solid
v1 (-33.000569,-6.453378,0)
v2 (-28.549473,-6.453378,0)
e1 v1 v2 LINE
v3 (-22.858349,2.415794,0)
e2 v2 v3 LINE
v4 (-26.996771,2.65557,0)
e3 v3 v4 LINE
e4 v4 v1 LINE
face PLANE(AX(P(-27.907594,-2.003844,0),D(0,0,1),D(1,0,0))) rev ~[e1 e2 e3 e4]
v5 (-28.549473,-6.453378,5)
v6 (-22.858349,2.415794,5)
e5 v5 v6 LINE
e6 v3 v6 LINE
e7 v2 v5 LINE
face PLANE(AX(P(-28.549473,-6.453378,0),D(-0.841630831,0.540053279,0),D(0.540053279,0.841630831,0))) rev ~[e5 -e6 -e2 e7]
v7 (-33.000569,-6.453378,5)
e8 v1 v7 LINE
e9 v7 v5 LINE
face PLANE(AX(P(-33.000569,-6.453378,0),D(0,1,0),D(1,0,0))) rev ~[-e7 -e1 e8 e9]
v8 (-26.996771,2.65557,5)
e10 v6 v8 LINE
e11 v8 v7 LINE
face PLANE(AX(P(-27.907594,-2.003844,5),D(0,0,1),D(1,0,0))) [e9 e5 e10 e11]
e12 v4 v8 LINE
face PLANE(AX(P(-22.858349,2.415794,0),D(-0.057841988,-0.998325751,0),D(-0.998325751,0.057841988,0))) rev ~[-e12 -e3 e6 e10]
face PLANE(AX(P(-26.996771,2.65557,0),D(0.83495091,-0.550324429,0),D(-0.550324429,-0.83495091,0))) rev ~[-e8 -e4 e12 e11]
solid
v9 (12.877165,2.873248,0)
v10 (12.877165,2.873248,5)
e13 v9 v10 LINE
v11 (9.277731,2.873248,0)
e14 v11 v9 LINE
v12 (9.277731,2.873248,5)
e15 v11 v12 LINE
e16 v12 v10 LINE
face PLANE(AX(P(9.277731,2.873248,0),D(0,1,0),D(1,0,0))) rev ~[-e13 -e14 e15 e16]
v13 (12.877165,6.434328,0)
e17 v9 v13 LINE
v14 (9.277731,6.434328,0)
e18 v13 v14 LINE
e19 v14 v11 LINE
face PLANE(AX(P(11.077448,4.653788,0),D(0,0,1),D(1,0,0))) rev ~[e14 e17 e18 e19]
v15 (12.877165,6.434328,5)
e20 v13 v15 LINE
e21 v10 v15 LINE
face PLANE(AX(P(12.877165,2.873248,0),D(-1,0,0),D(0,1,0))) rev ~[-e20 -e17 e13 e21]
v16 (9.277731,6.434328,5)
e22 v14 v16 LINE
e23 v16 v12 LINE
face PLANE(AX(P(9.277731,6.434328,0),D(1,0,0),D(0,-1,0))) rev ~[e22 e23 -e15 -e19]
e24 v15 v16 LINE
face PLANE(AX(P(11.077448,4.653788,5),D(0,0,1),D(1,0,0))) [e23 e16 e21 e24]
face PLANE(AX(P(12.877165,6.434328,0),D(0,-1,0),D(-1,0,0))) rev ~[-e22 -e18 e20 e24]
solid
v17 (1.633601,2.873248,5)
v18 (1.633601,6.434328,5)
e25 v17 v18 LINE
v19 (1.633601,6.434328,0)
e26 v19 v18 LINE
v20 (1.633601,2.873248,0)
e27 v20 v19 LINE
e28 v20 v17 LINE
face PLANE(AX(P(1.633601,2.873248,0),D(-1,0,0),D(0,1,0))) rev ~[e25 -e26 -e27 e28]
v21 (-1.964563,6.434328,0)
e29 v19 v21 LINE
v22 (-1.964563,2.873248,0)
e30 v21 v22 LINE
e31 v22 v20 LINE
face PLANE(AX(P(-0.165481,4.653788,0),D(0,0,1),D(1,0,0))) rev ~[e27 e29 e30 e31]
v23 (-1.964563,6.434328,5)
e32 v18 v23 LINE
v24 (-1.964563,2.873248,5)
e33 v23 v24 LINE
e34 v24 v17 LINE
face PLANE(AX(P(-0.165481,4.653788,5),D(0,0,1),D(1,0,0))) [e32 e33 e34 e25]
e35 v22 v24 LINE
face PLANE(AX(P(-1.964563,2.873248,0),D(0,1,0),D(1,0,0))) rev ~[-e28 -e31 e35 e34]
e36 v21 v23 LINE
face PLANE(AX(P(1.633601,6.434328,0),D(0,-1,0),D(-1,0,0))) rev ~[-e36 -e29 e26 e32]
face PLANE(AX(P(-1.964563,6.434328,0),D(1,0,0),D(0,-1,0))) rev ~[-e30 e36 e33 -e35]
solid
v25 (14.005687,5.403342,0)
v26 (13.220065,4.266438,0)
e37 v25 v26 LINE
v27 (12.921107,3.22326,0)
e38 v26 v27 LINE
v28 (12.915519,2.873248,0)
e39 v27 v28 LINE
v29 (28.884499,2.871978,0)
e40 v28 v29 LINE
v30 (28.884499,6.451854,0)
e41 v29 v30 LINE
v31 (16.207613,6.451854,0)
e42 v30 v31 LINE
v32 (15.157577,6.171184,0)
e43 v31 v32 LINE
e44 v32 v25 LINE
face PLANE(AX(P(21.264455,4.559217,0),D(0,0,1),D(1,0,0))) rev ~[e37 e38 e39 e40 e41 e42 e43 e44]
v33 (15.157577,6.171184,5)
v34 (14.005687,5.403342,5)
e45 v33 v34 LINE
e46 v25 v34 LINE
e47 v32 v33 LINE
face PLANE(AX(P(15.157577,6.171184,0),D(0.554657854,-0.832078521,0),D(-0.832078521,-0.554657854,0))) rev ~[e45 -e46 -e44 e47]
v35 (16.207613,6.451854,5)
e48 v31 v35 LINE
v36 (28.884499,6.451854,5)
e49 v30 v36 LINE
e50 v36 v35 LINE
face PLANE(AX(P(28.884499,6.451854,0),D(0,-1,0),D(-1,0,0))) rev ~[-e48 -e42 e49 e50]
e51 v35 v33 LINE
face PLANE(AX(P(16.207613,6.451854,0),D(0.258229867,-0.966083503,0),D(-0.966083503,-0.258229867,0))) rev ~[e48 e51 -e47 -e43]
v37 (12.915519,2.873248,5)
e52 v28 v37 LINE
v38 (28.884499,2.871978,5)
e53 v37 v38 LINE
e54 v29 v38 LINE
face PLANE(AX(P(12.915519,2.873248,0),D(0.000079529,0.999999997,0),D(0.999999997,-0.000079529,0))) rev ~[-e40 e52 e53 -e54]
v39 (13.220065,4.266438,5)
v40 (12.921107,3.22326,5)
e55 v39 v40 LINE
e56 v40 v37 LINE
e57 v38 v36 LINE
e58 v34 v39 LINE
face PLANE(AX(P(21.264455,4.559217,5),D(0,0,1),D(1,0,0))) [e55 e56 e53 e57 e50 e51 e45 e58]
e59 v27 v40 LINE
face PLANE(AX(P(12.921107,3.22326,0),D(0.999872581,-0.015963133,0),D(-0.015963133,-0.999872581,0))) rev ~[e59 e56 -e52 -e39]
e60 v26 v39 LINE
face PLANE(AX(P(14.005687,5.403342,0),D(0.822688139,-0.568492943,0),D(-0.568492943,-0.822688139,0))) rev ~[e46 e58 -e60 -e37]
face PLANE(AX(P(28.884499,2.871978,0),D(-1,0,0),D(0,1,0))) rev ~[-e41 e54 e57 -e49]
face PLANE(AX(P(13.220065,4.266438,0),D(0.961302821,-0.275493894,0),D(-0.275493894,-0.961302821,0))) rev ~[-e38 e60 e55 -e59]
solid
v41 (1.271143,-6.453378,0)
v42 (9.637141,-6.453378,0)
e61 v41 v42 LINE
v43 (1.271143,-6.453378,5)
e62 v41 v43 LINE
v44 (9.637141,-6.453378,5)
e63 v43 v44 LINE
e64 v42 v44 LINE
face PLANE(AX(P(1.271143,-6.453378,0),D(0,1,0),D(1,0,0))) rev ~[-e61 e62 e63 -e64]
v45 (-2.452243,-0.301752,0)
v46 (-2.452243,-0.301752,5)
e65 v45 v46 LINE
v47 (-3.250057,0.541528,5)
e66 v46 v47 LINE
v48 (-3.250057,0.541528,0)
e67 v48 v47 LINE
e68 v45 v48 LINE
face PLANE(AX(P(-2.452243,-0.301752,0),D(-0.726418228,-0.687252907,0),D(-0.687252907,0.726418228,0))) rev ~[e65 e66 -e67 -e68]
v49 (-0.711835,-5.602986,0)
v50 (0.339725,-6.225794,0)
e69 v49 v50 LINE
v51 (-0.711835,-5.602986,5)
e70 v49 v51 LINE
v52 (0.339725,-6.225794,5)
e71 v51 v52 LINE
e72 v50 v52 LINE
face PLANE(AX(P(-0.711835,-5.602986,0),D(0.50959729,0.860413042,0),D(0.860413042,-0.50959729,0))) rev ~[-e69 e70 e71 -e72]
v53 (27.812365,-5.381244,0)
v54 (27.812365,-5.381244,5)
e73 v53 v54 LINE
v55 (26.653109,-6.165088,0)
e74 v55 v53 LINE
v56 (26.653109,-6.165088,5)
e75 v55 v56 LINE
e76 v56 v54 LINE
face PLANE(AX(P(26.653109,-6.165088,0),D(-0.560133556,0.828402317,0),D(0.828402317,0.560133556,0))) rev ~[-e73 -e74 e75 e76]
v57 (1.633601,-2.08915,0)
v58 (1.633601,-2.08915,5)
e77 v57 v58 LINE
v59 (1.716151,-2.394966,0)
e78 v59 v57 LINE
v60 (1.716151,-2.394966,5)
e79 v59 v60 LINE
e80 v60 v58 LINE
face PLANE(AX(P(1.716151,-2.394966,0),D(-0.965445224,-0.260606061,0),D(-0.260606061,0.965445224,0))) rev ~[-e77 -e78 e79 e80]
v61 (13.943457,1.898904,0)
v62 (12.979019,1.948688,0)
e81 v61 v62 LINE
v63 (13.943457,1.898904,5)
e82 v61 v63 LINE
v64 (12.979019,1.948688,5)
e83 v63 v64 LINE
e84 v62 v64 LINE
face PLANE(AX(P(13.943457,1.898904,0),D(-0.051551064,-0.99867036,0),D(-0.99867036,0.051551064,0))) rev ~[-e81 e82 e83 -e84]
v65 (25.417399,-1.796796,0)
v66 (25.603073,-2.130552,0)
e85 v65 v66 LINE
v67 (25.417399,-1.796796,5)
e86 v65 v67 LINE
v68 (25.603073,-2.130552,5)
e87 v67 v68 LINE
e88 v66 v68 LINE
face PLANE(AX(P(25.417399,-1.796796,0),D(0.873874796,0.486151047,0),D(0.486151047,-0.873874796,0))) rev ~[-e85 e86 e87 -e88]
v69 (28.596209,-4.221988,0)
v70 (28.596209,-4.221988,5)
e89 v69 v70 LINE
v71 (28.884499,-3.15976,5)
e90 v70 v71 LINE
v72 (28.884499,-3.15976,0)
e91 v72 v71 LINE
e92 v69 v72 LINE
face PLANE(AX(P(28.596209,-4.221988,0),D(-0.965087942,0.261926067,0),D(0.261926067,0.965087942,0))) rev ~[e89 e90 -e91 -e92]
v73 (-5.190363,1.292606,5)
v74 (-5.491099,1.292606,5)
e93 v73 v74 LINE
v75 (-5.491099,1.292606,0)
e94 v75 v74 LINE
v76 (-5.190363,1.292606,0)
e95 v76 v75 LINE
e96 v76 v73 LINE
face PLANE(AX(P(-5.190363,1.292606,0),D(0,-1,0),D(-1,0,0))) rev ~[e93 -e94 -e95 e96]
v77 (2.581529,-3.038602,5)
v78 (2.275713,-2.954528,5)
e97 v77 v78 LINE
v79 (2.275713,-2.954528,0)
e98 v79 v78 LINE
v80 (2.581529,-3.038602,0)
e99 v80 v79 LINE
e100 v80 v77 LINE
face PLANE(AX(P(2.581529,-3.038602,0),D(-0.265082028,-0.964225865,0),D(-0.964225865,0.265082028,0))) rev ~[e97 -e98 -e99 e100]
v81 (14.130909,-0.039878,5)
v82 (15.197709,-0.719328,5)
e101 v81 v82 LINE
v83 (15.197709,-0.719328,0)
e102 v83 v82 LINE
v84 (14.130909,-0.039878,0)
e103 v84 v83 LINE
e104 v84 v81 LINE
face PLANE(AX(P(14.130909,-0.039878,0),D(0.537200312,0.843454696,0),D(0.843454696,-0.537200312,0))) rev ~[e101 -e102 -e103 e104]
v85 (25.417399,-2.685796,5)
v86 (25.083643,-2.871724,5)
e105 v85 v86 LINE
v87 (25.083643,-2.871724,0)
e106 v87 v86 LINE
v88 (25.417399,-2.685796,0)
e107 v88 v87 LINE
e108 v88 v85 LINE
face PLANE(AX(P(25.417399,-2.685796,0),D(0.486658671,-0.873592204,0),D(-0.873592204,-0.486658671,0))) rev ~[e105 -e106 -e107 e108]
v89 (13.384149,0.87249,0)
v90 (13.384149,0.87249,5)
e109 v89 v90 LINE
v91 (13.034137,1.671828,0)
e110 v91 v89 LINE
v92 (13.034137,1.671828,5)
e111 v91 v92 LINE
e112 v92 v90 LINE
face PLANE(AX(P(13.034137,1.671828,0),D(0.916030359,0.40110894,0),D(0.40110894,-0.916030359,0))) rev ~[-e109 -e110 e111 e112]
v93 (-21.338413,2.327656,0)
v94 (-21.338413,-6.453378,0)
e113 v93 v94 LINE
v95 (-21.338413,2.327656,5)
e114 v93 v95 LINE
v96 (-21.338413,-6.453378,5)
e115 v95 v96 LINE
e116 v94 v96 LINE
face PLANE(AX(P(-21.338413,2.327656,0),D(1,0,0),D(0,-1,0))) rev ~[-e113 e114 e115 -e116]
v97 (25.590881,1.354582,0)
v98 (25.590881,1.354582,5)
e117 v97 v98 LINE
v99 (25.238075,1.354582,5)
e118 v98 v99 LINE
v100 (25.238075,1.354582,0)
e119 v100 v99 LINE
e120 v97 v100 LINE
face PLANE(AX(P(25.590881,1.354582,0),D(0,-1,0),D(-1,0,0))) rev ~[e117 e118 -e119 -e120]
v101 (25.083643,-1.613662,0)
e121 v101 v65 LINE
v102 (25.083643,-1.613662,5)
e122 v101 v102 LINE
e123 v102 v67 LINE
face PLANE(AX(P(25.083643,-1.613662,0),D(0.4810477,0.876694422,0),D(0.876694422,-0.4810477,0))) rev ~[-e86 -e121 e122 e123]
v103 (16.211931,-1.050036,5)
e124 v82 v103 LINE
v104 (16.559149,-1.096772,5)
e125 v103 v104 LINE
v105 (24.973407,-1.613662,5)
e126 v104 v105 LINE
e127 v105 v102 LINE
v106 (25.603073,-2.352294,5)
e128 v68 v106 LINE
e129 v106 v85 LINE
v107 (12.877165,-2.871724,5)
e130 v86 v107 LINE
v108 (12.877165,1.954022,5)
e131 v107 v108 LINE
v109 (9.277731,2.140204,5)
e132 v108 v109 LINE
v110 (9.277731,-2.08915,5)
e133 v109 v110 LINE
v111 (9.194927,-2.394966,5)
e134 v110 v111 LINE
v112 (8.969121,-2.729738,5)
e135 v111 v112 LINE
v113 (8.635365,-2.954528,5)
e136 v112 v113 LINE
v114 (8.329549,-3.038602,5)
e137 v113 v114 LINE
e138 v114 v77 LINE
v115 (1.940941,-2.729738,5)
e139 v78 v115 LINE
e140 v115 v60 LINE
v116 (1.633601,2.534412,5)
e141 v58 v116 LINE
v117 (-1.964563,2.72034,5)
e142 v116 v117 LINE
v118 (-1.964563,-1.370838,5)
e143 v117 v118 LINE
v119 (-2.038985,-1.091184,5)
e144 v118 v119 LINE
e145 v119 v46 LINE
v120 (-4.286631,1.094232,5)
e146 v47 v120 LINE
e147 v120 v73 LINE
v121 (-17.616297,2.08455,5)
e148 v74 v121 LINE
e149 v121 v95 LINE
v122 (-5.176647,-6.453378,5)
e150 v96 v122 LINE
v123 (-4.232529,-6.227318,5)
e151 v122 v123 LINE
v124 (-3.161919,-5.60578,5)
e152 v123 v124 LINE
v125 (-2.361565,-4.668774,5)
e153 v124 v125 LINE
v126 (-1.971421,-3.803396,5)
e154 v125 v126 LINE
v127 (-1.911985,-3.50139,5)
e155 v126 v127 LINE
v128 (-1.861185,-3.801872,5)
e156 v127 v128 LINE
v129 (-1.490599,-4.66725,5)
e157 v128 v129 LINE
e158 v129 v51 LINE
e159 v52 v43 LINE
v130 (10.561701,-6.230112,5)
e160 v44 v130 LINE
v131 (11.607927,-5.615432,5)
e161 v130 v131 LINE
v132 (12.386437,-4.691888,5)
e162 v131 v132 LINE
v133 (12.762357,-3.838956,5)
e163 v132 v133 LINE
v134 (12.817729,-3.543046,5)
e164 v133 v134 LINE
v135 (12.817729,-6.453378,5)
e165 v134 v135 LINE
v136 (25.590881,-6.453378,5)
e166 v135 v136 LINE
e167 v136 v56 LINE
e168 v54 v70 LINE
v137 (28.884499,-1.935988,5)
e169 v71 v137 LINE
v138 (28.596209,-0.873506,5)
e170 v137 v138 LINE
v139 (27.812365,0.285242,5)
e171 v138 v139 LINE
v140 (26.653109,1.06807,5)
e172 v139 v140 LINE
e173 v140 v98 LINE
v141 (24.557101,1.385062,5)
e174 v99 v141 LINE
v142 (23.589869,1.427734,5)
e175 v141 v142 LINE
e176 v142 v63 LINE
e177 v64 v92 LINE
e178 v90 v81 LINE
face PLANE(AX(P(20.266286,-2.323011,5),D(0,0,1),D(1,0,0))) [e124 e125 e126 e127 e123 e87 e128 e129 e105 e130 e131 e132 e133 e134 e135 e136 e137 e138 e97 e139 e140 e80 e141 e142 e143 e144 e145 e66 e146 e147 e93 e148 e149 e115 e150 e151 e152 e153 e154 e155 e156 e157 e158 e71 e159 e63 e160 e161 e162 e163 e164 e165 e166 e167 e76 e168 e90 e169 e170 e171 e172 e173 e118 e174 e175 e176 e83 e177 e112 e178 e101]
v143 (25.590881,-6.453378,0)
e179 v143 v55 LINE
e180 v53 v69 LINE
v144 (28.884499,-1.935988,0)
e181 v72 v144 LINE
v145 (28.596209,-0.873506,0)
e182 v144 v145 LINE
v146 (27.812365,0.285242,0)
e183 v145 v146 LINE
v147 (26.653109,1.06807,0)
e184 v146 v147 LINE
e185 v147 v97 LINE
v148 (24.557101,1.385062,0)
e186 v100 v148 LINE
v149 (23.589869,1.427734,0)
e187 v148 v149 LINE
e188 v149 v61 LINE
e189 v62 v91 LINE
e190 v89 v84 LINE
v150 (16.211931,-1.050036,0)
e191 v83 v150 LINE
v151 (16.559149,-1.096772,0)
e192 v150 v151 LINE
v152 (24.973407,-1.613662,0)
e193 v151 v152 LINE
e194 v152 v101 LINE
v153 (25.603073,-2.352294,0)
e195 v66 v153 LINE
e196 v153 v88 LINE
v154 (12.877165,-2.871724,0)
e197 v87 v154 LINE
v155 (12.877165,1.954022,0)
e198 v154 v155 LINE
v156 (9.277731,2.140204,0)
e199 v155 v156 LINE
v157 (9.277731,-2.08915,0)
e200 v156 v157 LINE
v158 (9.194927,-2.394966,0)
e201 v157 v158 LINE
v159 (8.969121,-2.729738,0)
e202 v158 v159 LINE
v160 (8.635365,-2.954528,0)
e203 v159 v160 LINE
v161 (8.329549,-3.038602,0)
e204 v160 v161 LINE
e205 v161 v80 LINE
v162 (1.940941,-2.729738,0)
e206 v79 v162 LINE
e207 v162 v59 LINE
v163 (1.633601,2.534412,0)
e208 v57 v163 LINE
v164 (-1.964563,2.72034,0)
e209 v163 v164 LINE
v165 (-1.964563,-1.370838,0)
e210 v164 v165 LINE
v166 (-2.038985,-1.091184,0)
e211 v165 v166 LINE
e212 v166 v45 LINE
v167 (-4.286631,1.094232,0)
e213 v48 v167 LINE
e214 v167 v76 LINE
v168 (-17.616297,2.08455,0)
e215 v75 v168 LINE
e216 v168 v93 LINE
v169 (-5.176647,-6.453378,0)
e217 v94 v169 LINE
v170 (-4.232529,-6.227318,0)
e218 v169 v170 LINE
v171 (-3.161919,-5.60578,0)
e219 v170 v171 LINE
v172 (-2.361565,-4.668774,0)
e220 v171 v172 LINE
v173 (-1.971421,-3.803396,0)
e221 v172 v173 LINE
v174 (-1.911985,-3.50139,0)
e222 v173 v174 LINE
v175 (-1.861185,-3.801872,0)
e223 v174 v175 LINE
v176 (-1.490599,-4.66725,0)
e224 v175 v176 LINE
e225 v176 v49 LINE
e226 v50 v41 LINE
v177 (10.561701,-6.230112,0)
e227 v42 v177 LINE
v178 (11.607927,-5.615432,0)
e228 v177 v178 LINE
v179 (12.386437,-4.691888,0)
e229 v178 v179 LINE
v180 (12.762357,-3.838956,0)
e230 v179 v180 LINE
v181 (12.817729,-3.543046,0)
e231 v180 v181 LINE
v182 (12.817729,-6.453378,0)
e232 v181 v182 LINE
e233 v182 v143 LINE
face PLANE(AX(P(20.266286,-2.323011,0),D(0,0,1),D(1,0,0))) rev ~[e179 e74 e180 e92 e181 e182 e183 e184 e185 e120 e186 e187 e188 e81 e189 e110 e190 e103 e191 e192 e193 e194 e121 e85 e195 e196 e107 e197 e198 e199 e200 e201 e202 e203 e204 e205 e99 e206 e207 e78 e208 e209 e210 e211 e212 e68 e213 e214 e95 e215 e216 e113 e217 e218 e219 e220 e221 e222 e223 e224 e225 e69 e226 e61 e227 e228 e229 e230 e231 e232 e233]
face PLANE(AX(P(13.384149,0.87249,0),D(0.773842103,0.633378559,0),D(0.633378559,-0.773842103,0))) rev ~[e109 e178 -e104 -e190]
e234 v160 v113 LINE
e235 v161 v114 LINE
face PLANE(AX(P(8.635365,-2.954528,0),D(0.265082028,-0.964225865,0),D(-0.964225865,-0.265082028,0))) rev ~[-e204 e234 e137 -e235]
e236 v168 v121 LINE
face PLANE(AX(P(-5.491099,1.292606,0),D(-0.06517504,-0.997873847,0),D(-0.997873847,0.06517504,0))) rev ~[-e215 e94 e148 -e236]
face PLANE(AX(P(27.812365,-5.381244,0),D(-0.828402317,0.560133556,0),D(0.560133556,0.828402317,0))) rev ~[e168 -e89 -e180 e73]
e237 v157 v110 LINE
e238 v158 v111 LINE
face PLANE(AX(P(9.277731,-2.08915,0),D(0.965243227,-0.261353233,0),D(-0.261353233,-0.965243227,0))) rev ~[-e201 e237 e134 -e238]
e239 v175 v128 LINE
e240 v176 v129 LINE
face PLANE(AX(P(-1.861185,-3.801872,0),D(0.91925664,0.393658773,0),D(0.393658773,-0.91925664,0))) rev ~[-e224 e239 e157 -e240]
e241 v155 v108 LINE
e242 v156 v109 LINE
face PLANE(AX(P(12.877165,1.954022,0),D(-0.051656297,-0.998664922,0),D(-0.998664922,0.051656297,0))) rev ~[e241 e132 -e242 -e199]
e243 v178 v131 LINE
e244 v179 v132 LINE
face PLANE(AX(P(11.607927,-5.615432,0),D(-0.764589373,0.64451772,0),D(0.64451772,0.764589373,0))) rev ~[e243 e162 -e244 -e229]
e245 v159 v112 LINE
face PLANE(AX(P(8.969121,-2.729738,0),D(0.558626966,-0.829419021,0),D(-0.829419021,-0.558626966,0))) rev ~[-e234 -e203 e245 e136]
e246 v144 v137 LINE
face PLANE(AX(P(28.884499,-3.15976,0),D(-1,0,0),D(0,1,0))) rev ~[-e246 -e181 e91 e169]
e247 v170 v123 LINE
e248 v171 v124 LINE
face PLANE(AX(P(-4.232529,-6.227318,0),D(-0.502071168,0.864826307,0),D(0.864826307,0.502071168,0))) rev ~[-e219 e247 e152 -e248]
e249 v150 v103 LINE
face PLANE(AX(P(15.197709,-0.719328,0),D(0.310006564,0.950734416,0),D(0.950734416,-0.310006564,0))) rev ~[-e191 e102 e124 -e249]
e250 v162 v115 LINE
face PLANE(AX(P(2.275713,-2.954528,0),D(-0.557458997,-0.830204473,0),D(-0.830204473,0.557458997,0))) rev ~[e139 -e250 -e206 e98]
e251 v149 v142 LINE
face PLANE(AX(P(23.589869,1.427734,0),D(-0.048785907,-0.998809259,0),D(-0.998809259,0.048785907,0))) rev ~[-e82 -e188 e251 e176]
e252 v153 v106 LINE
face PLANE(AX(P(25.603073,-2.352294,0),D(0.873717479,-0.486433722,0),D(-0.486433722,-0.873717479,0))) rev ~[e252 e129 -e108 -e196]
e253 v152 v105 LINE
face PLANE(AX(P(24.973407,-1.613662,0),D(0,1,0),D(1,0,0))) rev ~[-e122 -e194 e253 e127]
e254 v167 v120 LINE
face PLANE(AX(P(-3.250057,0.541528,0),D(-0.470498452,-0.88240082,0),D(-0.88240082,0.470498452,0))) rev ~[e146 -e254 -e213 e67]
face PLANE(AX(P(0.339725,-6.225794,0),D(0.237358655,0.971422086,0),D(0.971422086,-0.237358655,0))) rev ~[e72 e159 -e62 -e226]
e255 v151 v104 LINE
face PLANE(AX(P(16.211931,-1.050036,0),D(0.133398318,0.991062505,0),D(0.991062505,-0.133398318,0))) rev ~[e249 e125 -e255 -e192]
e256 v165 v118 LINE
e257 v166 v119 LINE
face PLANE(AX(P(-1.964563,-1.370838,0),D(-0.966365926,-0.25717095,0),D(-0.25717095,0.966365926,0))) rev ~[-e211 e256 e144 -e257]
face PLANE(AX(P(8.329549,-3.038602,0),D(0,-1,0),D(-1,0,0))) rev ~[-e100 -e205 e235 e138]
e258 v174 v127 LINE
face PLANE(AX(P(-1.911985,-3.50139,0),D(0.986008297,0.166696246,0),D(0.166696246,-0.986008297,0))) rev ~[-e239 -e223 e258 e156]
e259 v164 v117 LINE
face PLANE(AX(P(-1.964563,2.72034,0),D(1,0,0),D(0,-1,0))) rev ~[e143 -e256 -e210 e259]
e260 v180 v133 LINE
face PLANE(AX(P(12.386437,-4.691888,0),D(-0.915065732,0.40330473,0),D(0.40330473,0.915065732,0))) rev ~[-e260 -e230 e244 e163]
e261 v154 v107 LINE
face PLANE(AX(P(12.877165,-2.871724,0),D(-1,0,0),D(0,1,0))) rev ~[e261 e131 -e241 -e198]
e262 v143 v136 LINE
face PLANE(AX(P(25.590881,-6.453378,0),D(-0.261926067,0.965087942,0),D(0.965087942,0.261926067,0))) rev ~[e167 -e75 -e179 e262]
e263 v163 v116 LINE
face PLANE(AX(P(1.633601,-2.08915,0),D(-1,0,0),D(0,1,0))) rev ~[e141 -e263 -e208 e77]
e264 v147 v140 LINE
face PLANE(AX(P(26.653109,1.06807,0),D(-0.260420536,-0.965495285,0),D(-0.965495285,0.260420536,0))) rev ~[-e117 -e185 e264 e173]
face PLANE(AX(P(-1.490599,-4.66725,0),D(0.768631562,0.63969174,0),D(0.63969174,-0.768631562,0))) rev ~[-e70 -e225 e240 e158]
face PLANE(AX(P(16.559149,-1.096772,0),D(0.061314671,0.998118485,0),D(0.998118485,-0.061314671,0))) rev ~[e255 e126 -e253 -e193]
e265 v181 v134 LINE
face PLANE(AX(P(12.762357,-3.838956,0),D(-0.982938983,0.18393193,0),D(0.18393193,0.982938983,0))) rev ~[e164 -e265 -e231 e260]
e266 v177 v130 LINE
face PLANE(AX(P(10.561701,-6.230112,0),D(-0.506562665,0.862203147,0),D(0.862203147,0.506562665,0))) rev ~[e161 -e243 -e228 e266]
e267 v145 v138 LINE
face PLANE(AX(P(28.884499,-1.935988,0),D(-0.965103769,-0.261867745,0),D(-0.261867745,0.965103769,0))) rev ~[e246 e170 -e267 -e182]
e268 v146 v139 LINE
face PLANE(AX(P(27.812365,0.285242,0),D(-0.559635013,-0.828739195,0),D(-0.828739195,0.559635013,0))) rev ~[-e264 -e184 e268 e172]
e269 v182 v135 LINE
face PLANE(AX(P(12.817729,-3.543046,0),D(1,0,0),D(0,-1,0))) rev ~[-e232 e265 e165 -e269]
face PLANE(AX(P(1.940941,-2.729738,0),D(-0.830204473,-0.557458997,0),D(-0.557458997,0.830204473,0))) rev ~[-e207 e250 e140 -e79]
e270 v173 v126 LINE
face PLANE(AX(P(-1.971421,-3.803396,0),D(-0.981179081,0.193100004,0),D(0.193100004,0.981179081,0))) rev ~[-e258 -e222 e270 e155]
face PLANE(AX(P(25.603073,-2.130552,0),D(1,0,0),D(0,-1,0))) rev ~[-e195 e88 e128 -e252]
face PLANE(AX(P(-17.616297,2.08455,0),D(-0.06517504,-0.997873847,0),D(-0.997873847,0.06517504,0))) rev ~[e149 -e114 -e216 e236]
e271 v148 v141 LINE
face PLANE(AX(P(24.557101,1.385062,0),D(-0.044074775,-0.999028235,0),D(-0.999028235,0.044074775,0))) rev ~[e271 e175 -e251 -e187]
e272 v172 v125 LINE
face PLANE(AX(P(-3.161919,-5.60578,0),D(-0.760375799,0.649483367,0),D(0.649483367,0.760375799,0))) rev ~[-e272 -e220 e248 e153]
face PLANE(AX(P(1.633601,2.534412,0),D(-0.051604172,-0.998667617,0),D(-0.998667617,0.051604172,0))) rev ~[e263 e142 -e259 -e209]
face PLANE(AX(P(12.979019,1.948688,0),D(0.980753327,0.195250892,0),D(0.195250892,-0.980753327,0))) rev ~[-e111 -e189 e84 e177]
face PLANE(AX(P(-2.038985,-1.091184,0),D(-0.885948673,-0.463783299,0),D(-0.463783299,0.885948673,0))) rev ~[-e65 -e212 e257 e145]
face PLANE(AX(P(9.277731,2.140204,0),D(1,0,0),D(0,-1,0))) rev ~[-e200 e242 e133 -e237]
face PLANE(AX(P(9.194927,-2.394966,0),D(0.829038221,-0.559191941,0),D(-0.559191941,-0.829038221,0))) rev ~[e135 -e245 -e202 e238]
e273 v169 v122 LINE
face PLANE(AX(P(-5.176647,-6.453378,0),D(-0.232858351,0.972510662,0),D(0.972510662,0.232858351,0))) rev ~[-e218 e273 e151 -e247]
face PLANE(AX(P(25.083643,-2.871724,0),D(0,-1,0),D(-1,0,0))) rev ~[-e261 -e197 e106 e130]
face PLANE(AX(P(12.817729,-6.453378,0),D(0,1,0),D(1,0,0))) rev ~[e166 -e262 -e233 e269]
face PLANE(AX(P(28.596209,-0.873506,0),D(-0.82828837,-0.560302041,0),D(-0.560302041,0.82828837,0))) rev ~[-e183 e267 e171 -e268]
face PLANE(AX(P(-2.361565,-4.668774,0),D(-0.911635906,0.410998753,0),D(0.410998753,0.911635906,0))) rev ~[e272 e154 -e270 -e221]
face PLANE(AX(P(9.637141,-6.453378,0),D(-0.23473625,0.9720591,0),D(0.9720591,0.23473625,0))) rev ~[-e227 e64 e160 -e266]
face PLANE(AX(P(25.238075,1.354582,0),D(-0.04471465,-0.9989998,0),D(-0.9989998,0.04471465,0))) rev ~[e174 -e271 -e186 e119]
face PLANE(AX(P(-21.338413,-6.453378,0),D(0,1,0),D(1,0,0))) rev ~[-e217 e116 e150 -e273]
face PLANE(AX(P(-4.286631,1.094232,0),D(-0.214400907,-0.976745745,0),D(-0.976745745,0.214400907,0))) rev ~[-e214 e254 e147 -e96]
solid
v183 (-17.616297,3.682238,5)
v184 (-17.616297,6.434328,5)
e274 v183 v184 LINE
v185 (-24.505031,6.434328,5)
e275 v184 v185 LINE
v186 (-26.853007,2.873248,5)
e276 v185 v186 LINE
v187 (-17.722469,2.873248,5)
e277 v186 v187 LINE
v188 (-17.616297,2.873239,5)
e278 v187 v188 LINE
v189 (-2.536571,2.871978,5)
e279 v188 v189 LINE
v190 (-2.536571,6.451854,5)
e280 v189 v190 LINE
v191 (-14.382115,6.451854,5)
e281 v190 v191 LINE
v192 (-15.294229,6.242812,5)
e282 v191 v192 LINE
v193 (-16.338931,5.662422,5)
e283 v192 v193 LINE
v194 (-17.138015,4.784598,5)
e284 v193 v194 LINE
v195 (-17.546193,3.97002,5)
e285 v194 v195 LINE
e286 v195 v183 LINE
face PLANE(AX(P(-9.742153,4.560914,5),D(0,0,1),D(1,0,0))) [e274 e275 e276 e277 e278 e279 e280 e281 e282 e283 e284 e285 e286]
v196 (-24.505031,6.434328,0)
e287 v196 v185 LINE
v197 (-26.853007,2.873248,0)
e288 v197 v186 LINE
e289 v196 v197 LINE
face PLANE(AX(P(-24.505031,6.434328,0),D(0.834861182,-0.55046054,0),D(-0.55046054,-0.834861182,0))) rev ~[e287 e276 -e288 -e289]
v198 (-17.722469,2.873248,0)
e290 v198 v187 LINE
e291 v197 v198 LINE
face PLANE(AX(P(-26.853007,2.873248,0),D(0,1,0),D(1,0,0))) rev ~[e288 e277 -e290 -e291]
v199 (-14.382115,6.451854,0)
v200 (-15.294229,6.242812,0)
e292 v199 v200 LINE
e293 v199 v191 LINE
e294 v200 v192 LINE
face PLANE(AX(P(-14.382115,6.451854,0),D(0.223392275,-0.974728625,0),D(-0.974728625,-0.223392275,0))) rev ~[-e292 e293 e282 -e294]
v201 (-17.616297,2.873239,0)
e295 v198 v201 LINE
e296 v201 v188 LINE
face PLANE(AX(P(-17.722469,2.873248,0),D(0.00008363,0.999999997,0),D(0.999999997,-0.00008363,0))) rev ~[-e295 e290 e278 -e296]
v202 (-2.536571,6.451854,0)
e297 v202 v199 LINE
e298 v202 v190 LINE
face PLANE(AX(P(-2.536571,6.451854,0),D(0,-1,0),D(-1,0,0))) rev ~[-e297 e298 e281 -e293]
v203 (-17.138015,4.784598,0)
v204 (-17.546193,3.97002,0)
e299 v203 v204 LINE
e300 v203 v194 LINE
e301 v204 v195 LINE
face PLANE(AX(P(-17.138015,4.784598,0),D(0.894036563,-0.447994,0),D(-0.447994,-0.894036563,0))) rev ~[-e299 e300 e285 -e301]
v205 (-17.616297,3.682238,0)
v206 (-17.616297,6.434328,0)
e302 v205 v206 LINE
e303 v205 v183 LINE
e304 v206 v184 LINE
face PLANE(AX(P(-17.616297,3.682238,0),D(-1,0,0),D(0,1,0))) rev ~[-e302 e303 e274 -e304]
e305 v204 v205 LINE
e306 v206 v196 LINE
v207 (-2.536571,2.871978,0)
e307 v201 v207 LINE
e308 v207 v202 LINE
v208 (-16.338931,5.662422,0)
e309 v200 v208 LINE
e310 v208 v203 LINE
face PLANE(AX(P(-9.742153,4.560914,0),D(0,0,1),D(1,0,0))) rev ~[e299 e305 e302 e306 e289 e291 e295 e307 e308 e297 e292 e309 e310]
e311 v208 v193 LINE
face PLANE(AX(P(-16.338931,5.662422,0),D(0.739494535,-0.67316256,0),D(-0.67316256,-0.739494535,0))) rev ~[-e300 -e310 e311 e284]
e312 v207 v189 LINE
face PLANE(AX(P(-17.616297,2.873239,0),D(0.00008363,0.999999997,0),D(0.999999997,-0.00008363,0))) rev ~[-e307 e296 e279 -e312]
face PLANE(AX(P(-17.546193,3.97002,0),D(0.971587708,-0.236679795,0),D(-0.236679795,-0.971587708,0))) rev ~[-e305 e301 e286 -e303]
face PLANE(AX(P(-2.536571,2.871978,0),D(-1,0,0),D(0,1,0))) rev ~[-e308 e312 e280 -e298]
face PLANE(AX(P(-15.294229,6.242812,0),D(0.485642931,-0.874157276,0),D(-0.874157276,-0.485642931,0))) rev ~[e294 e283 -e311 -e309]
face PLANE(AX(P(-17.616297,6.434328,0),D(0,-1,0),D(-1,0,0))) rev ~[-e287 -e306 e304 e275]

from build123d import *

# Parameters (mm, degrees)
F1_DEPTH = 5


# Not quite as in the source:
# - the program builds the solid bodies; features that only make, move or delete a surface that nothing else refers to are left out


with BuildPart() as f1:
    # F0 (on Top) → F1 (new body)
    with BuildSketch(Plane.XY):
        Polygon((1.633601, 6.434328), (1.582547, 6.434328), (-1.964563, 6.434328), (-1.964563, 2.873248), (1.633601, 2.873248), align=None)
    extrude(amount=F1_DEPTH)


with BuildPart() as f1b:
    # F0 (on Top) → F1, piece 2 (new body)
    with BuildSketch(Plane.XY):
        Polygon((-28.549473, -6.453378), (-22.858349, 2.415794), (-26.996771, 2.65557), (-33.000569, -6.453378), align=None)
    extrude(amount=F1_DEPTH)


with BuildPart() as f1c:
    # F0 (on Top) → F1, piece 3 (new body)
    with BuildSketch(Plane.XY):
        Polygon((12.915519, 2.873248), (28.884499, 2.871978), (28.884499, 6.451854), (16.559149, 6.451854), (16.207613, 6.451854), (15.157577, 6.171184), (14.005687, 5.403342), (13.220065, 4.266438), (12.921107, 3.22326), align=None)
    extrude(amount=F1_DEPTH)


with BuildPart() as f1d:
    # F0 (on Top) → F1, piece 4 (new body)
    with BuildSketch(Plane.XY):
        Polygon((9.277731, 6.434328), (9.277731, 2.873248), (12.877165, 2.873248), (12.877165, 6.434328), (9.329801, 6.434328), align=None)
    extrude(amount=F1_DEPTH)


with BuildPart() as f1e:
    # F0 (on Top) → F1, piece 5 (new body)
    with BuildSketch(Plane.XY):
        Polygon((12.877165, -2.871724), (12.817729, -3.543046), (12.817729, -6.453378), (25.238075, -6.453378), (25.590881, -6.453378), (26.653109, -6.165088), (27.812365, -5.381244), (28.596209, -4.221988), (28.884499, -3.15976), (28.884499, -2.807208), (28.884499, -2.290318), (28.884499, -1.935988), (28.596209, -0.873506), (27.812365, 0.285242), (26.653109, 1.06807), (25.590881, 1.354582), (25.238075, 1.354582), (24.557101, 1.385062), (23.589869, 1.427734), (13.943457, 1.898904), (12.979019, 1.948688), (13.034137, 1.671828), (13.384149, 0.87249), (14.130909, -0.039878), (15.197709, -0.719328), (16.211931, -1.050036), (16.559149, -1.096772), (24.973407, -1.613662), (25.083643, -1.613662), (25.417399, -1.796796), (25.603073, -2.130552), (25.603073, -2.242058), (25.603073, -2.352294), (25.417399, -2.685796), (25.083643, -2.871724), (24.973407, -2.871724), align=None)
        Polygon((-17.616297, -2.871978), (-17.616297, -2.871724), (-17.616297, 1.7653), (-17.616297, 2.08455006), (-21.338413, 2.327656), (-21.338413, -6.453378), (-17.912715, -6.453378), (-17.616297, -6.453378), align=None)
        Polygon((-1.964563, 2.72034), (-1.964563, -1.370838), (-1.911985, -3.50139), (-1.861185, -3.801872), (-1.490599, -4.66725), (-0.711835, -5.602986), (0.339725, -6.225794), (1.271143, -6.453378), (1.582547, -6.453378), (9.329801, -6.453378), (9.637141, -6.453378), (10.561701, -6.230112), (11.607927, -5.615432), (12.386437, -4.691888), (12.762357, -3.838956), (12.817729, -3.543046), (12.877165, -2.871724), (12.877165, 1.954022), (9.277731, 2.140204), (9.277731, -1.986788), (9.277731, -2.08915), (9.194927, -2.394966), (8.969121, -2.729738), (8.635365, -2.954528), (8.329549, -3.038602), (8.227441, -3.038602), (2.683637, -3.038602), (2.581529, -3.038602), (2.275713, -2.954528), (1.940941, -2.729738), (1.716151, -2.394966), (1.633601, -2.08915), (1.633601, -1.986788), (1.633601, 2.534412), align=None)
        Polygon((-17.616297, 1.7653), (-17.616297, -2.871724), (-17.616297, -2.871978), (-17.616297, -6.453378), (-5.491099, -6.453378), (-5.176647, -6.453378), (-4.232529, -6.227318), (-3.161919, -5.60578), (-2.361565, -4.668774), (-1.971421, -3.803396), (-1.911985, -3.50139), (-1.964563, -1.370838), (-2.038985, -1.091184), (-2.452243, -0.301752), (-3.250057, 0.541528), (-4.286631, 1.094232), (-5.190363, 1.292606), (-5.491099, 1.292606), (-17.616297, 2.08455006), align=None)
    extrude(amount=F1_DEPTH)


with BuildPart() as f1f:
    # F0 (on Top) → F1, piece 6 (new body)
    with BuildSketch(Plane.XY):
        Polygon((-17.616297, 2.8732391208), (-2.536571, 2.871978), (-2.536571, 6.451854), (-14.077569, 6.451854), (-14.382115, 6.451854), (-15.294229, 6.242812), (-16.338931, 5.662422), (-17.138015, 4.784598), (-17.546193, 3.97002), (-17.616297, 3.682238), align=None)
        Polygon((-17.722469, 2.873248), (-17.616297, 2.8732391208), (-17.616297, 3.682238), (-17.616297, 6.434328), (-24.505031, 6.434328), (-26.853007, 2.873248), align=None)
    extrude(amount=F1_DEPTH)


solid = Compound([f1.part, f1b.part, f1c.part, f1d.part, f1e.part, f1f.part])
